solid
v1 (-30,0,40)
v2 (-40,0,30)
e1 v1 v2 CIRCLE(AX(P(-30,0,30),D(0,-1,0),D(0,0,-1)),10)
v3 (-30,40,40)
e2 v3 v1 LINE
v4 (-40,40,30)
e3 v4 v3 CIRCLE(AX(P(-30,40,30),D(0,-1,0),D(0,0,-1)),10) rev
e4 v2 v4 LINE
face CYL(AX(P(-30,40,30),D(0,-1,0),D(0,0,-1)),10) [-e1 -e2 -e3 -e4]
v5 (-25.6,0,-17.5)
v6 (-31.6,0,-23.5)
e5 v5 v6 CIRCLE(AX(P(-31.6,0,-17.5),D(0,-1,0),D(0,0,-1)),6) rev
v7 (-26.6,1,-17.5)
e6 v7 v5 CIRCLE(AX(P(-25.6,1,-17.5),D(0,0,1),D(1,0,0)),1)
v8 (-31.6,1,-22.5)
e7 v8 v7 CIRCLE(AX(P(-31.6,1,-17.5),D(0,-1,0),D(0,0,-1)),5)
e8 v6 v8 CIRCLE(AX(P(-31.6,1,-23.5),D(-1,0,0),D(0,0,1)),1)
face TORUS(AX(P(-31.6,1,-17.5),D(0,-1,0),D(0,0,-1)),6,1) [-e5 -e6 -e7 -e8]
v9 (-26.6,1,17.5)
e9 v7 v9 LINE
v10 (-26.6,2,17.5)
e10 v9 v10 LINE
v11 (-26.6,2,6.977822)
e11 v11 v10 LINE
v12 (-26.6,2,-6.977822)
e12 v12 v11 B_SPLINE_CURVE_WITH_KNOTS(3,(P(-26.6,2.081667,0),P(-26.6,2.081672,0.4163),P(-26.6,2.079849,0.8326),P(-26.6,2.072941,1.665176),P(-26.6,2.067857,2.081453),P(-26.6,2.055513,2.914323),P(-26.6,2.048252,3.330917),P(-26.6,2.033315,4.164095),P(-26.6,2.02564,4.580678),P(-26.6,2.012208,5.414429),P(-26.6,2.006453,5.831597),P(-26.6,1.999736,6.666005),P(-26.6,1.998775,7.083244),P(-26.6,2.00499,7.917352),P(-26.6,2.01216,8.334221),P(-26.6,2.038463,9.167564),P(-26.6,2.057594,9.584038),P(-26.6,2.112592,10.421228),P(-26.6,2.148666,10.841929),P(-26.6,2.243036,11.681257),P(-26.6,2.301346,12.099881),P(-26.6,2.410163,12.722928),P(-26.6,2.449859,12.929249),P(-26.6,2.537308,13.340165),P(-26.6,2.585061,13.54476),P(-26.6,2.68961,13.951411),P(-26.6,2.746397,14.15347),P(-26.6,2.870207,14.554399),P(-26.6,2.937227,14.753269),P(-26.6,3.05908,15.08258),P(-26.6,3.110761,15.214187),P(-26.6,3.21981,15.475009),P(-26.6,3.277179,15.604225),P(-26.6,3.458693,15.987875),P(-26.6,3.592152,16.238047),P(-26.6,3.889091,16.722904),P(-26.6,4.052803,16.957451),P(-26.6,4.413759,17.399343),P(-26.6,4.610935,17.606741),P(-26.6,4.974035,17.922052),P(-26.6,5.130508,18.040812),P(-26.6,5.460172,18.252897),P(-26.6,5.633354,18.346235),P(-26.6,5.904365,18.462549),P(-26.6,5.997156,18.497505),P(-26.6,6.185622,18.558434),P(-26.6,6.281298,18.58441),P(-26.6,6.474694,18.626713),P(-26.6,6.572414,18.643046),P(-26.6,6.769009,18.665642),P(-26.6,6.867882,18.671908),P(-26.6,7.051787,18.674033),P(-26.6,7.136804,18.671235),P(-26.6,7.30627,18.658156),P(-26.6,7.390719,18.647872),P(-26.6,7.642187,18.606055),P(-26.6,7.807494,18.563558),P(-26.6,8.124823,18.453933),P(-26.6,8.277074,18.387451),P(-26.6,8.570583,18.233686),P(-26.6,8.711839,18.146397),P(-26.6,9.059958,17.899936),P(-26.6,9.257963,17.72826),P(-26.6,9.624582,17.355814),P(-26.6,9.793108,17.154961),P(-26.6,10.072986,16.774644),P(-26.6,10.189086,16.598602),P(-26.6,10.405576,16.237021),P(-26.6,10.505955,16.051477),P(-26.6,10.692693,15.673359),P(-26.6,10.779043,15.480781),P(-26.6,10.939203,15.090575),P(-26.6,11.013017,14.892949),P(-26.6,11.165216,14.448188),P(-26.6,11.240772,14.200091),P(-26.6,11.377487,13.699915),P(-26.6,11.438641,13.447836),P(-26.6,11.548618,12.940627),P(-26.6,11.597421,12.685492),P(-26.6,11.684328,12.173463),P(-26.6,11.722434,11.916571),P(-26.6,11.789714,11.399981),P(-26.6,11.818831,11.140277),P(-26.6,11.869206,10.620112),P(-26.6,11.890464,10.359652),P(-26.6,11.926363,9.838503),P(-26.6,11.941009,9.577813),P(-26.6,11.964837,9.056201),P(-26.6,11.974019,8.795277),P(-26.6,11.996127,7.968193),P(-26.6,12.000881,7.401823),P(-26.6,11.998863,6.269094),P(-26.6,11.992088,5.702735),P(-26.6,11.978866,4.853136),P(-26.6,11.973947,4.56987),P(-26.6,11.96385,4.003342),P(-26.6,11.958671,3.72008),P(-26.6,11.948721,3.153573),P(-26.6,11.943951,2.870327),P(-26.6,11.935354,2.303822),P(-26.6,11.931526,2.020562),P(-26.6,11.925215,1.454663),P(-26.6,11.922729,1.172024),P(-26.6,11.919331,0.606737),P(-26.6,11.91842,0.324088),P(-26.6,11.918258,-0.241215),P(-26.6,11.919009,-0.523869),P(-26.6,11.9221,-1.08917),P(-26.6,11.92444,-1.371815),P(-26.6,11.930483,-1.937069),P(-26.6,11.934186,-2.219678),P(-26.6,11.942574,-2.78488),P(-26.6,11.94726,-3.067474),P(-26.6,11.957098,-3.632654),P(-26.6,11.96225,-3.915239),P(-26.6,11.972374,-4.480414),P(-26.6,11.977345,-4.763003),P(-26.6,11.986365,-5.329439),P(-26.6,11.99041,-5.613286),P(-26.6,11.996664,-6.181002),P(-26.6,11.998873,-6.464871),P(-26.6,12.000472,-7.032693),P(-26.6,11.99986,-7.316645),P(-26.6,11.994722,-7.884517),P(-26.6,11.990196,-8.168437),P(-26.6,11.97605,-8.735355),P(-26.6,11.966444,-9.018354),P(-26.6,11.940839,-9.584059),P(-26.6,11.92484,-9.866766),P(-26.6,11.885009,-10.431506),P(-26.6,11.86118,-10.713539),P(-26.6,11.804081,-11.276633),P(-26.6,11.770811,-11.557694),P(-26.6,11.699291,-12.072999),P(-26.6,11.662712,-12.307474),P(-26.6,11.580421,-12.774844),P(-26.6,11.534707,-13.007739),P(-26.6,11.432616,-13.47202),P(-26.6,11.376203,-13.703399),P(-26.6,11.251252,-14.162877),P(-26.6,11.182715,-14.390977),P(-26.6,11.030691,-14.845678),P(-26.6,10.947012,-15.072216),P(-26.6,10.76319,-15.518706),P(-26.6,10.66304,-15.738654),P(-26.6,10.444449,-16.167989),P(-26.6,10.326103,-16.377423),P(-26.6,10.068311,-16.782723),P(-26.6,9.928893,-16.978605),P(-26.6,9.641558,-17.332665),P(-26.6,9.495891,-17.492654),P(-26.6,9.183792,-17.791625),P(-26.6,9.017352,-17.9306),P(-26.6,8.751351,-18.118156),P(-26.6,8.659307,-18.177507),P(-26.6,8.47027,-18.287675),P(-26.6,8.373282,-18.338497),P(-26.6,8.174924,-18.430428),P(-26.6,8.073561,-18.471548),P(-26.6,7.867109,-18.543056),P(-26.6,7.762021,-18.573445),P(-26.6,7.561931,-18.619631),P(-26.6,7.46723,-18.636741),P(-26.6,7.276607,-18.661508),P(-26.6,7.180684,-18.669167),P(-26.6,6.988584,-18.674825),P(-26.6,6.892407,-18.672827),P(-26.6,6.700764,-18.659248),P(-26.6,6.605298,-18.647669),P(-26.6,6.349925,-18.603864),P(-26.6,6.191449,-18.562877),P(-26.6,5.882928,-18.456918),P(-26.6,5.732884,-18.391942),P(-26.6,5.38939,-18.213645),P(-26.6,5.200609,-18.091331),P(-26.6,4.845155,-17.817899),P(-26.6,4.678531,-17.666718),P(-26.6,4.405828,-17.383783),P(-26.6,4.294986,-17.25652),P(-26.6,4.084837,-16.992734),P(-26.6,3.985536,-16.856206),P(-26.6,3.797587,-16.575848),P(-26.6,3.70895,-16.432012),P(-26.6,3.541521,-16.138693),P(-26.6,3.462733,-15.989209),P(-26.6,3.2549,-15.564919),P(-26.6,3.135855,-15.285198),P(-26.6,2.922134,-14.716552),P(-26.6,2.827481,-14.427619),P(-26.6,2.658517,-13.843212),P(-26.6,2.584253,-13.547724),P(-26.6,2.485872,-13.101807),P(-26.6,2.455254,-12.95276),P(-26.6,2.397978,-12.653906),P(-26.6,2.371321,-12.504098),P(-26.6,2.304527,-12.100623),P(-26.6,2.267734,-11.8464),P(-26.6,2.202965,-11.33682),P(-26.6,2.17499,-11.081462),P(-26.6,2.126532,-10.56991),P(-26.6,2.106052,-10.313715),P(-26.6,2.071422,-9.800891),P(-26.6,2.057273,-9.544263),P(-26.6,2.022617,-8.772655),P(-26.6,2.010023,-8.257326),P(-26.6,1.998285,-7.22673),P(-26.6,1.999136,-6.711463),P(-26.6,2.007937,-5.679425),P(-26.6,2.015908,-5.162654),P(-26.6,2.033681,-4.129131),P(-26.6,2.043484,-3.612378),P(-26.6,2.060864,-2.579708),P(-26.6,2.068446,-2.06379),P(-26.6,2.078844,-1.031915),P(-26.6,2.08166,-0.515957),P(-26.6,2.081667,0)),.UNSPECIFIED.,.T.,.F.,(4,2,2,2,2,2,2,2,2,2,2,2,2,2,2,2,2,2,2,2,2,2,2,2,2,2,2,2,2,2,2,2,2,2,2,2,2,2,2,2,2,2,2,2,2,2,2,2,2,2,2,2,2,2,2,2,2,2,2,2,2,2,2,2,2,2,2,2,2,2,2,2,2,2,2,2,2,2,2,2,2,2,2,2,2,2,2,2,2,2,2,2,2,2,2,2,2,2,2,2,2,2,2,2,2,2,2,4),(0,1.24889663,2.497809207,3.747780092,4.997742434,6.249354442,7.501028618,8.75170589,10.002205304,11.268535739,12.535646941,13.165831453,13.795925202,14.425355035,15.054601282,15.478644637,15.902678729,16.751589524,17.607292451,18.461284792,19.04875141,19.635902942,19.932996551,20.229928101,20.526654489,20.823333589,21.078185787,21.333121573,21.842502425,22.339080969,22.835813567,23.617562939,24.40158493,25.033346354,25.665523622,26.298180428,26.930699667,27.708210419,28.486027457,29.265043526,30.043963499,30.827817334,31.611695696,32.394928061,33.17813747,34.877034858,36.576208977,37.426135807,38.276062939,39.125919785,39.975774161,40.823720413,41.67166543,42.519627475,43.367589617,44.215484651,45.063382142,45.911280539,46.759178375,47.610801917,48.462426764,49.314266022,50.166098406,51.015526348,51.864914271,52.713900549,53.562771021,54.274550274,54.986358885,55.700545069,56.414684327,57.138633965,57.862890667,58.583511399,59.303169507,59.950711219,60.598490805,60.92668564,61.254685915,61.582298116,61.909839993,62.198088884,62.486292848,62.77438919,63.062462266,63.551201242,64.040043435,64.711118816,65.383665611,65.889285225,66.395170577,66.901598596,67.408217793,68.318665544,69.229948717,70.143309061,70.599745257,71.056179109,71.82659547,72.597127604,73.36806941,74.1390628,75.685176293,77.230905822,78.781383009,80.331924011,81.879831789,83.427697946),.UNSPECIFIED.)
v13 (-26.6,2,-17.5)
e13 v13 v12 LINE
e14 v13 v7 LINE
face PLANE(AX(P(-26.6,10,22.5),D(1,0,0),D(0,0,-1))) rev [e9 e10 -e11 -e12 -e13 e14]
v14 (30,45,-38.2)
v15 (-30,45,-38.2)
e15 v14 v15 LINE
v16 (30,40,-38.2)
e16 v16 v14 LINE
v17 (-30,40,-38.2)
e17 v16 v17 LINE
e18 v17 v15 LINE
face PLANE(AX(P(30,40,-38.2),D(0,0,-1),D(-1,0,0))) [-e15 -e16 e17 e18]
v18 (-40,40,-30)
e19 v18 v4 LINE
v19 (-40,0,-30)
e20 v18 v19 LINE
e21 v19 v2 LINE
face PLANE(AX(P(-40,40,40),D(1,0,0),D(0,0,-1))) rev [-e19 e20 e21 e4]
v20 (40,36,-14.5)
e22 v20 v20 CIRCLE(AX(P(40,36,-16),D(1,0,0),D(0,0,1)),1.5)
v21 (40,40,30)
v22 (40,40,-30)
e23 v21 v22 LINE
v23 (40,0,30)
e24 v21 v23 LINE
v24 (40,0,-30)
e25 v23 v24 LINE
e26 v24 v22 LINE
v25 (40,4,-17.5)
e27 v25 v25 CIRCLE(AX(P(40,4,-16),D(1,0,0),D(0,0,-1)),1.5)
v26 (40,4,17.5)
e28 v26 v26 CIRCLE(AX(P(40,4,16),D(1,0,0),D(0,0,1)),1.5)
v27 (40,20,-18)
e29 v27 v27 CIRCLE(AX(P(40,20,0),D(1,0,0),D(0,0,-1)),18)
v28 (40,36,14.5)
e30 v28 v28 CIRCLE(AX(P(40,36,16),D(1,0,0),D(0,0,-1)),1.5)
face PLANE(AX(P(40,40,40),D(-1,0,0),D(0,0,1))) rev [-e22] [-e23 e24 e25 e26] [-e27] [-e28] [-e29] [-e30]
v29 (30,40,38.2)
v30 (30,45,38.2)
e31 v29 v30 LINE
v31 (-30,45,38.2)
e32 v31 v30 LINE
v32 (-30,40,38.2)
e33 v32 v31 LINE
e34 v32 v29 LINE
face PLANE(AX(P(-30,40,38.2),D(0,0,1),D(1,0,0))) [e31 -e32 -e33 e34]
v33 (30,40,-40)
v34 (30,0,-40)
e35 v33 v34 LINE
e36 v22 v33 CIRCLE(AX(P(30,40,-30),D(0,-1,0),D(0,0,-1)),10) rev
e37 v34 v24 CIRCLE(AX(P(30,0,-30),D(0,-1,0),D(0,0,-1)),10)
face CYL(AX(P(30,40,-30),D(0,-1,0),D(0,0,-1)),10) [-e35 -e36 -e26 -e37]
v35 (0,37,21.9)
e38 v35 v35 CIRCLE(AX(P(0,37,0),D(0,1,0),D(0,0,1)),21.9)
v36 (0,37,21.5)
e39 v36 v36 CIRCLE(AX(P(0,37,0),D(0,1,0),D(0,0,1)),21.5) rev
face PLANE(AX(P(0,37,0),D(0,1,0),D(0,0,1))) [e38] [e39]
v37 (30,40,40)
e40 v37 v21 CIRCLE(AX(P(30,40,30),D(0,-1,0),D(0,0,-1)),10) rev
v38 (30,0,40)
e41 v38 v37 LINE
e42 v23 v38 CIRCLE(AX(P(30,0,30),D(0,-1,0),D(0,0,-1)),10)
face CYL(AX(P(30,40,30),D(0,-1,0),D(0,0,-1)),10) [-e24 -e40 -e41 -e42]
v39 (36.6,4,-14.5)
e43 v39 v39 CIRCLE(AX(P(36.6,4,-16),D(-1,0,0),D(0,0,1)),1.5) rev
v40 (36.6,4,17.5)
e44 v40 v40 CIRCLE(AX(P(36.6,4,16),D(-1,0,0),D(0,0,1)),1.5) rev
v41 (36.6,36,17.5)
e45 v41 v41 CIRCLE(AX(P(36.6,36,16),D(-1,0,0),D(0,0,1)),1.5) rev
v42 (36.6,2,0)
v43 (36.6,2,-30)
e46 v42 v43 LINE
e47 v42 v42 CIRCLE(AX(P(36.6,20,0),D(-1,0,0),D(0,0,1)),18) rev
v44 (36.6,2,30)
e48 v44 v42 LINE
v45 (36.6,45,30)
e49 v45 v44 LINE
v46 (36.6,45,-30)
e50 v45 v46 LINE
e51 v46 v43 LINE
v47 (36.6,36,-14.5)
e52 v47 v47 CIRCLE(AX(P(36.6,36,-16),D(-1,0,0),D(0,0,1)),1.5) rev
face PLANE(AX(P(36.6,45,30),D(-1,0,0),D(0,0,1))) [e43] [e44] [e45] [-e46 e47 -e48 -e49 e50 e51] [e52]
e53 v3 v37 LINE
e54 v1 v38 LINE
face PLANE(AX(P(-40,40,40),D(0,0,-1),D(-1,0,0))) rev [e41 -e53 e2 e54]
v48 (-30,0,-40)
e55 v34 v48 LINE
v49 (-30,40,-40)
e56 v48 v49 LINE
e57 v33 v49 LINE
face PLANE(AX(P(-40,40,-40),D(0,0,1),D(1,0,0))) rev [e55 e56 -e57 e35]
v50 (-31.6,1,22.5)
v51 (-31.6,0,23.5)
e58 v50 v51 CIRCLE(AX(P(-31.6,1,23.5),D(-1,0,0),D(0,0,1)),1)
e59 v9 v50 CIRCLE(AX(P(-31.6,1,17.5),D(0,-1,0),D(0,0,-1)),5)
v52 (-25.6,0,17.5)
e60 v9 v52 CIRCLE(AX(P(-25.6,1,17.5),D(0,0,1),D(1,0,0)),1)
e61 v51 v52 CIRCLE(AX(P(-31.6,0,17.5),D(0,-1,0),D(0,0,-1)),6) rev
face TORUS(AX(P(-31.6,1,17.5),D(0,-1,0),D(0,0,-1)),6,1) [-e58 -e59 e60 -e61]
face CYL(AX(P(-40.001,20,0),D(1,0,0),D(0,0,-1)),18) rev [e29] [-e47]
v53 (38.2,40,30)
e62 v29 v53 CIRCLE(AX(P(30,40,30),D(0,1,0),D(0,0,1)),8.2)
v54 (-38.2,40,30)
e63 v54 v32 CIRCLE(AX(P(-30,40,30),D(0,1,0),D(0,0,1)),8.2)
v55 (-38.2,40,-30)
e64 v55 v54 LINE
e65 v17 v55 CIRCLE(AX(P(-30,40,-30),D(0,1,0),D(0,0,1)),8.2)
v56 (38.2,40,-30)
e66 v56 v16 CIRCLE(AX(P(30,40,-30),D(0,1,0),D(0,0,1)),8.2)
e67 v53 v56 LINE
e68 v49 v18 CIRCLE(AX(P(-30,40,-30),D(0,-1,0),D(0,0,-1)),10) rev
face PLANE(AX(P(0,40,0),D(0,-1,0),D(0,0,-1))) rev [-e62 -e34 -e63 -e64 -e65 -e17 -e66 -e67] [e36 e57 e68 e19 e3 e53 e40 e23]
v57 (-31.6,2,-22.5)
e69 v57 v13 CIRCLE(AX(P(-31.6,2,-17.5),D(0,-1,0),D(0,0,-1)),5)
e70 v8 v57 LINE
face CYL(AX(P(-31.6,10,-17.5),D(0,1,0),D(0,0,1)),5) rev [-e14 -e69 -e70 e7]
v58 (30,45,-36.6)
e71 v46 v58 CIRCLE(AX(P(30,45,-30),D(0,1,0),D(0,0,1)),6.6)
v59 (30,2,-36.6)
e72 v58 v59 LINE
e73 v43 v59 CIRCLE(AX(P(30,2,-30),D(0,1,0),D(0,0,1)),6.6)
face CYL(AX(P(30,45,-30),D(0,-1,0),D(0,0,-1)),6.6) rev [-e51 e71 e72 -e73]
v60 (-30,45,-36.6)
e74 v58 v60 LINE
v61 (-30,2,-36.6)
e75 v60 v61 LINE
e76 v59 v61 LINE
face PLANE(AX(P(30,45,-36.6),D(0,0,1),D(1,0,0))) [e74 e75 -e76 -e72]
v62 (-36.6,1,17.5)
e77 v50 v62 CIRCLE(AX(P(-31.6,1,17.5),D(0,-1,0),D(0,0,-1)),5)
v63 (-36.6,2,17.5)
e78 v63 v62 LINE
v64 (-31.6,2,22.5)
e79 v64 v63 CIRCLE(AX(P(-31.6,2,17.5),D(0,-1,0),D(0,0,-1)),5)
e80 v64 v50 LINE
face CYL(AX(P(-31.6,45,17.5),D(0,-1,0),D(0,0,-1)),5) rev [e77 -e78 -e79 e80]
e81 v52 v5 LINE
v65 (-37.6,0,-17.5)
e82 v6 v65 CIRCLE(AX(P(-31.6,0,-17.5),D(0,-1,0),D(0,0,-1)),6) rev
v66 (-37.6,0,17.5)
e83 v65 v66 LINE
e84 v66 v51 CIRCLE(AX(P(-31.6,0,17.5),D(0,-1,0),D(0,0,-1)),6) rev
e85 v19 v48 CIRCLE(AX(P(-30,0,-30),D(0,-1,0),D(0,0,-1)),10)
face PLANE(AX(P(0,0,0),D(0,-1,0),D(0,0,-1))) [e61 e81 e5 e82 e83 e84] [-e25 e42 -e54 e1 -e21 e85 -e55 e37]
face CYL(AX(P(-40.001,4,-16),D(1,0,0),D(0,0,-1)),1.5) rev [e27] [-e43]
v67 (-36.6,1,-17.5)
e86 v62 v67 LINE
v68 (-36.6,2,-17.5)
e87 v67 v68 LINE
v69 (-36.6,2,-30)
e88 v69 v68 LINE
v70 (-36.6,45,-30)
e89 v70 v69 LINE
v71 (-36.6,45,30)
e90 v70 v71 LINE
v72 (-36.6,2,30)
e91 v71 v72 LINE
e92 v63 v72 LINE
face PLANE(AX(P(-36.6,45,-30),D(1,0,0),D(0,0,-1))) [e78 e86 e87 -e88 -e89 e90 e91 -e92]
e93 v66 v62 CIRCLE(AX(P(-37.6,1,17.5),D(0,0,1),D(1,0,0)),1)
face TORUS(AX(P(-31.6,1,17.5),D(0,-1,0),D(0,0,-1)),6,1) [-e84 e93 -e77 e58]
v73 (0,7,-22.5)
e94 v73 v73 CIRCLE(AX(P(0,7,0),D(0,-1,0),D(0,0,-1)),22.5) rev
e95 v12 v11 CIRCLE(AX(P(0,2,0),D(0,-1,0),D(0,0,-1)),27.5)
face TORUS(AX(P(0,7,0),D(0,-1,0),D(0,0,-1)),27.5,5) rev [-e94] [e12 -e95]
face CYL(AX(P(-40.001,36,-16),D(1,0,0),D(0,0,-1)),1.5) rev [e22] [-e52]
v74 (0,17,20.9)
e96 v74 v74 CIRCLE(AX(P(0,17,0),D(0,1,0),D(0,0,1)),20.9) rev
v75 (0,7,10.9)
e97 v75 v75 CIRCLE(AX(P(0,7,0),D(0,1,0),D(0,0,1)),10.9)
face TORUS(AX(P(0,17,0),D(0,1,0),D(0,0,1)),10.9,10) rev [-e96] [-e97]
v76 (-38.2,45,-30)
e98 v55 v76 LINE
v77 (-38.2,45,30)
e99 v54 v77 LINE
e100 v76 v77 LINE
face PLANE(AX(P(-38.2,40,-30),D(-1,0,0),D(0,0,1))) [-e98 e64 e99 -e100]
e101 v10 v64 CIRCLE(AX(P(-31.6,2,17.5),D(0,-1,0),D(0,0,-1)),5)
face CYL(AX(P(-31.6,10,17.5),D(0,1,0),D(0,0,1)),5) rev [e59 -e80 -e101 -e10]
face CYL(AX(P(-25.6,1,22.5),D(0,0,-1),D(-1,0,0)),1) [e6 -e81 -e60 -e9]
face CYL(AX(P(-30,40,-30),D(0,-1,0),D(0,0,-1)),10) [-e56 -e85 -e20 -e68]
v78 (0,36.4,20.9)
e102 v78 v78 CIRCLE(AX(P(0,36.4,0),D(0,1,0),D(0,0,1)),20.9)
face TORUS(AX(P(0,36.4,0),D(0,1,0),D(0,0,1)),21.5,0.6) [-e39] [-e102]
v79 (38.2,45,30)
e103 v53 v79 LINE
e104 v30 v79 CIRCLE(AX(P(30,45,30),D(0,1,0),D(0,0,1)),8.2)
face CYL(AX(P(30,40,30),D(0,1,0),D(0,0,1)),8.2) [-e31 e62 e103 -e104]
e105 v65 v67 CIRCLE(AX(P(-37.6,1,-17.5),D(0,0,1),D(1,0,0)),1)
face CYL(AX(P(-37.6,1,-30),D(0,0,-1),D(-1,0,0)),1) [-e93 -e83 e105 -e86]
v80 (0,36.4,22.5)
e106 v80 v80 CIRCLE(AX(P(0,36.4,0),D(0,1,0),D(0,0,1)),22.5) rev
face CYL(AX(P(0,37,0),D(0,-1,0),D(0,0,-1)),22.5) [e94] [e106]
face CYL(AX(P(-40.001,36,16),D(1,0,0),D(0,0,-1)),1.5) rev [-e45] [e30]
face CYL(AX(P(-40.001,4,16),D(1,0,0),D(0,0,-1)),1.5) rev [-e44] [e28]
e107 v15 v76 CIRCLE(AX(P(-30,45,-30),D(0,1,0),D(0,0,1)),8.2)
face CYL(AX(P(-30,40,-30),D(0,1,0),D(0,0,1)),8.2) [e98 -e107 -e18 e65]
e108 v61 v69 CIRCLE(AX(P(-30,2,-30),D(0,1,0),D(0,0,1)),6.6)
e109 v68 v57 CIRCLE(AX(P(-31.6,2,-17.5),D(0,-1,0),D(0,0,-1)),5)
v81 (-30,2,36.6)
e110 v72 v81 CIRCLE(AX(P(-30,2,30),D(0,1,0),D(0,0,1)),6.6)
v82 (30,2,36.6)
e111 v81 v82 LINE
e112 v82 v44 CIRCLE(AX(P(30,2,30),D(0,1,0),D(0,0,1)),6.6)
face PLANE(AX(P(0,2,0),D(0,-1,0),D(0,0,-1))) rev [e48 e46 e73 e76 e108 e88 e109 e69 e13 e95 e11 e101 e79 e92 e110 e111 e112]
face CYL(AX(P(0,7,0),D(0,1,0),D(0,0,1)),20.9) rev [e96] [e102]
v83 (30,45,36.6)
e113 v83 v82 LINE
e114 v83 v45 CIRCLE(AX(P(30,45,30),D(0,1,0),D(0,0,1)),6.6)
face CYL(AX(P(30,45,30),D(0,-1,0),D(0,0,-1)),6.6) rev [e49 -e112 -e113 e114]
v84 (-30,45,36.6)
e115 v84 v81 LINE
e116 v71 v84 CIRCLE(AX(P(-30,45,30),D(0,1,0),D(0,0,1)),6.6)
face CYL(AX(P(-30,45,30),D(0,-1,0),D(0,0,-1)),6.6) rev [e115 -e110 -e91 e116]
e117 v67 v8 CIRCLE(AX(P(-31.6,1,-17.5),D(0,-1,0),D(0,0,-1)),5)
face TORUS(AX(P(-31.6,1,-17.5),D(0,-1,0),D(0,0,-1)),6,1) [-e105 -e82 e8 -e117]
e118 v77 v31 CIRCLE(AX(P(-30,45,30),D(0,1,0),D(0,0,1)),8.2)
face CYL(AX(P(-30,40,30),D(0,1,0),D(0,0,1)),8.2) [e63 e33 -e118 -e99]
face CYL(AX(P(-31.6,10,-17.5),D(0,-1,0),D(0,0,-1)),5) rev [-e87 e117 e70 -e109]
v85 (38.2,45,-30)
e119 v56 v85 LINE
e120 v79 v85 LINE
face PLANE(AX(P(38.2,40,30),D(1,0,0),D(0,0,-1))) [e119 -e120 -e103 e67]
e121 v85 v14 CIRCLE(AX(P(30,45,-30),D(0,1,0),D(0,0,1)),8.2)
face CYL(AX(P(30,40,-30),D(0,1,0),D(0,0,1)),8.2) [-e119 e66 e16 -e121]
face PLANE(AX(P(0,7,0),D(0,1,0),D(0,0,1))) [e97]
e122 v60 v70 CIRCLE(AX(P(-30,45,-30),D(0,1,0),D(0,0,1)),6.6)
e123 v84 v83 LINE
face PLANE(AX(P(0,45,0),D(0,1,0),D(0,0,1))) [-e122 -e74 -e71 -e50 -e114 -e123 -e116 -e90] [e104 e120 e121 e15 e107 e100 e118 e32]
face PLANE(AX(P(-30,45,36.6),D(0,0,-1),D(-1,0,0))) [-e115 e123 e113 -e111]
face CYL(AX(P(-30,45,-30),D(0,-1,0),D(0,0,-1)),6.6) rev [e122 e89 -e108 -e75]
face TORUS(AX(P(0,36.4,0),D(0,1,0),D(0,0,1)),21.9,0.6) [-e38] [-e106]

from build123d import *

# Parameters (mm, degrees)
SKETCH1_W                = 80
SKETCH1_H                = 80
BOSS_EXTRUDE1_DEPTH      = 40
FILLET1_R                = 10
BOSS_EXTRUDE5_DEPTH      = 5
CUT_EXTRUDE6_DEPTH       = 43
SKETCH8_R                = 22.5
BOSS_EXTRUDE4_DEPTH      = 35
SKETCH9_R                = 20.900000000000002
CUT_EXTRUDE5_DEPTH       = 30
FILLET2_R                = 10
CUT_FAN_REACH            = 102.125
SKETCH10_R               = 18
SKETCH10_R_2             = 1.5000000000000007
SKETCH10_R_3             = 1.5000000000000009
FILLET3_R                = 5
FILLET5_R                = 0.6
CUT_EXTRUDE10_DEPTH      = 8
CUT_EXTRUDE10_DEPTH_BACK = 8
FILLET10_R               = 5
FILLET9_R                = 1


with BuildPart() as part:
    # Sketch1 → Boss-Extrude1 (new body)
    with BuildSketch(Plane(origin=(0, 0, 0), x_dir=(1, 0, 0), z_dir=(0, 1, 0))):
        Rectangle(SKETCH1_W, SKETCH1_H)
    extrude(amount=BOSS_EXTRUDE1_DEPTH)

    # Fillet1
    fillet1_edges = [part.edges().sort_by_distance(p)[0] for p in [
        (40, 20, 40),
        (-40, 20, 40),
        (-40, 20, -40.00000000000001),
        (40, 20, -40.00000000000001),
    ]]
    fillet(fillet1_edges, radius=FILLET1_R)

    # 3DSketch4 → Boss-Extrude5 (add)
    with BuildSketch(Plane(origin=(-38.199999999999996, 40, -30.000000000000007), x_dir=(0.786461199740678, 0, 0.6176396856602184), z_dir=(0, 1, 0))):
        with BuildLine():
            Line((0, 0), (37.058381139613104, -47.187671984440684))
            ThreePointArc((37.058381139613104, -47.187671984440684), (42.52848931067159, -50.264390473830375), (48.57200839990046, -48.572008399900454))
            Line((48.57200839990046, -48.572008399900454), (95.75968038434114, -11.513627260287345))
            ThreePointArc((95.75968038434114, -11.513627260287345), (98.83639887373083, -6.043519089228864), (97.1440167998009, 0))
            Line((97.1440167998009, 0), (60.08563566018779, 47.187671984440684))
            ThreePointArc((60.08563566018779, 47.187671984440684), (54.61552748912932, 50.26439047383036), (48.572008399900454, 48.57200839990046))
            Line((48.572008399900454, 48.57200839990046), (1.3843364154597682, 11.513627260287349))
            ThreePointArc((1.3843364154597682, 11.513627260287349), (-1.6923820739299176, 6.0435190892288695), (0, 0))
        make_face()
    extrude(amount=BOSS_EXTRUDE5_DEPTH)

    # 3DSketch5 → Cut-Extrude6 (cut)
    with BuildSketch(Plane(origin=(-36.6, 45.00000000000001, -30.00000000000001), x_dir=(0.7733921049602126, 0, 0.6339279548854203), z_dir=(0, 1, 0))):
        with BuildLine():
            Line((0, 0), (38.03567729312523, -46.40352629761277))
            ThreePointArc((38.03567729312523, -46.40352629761277), (42.489199280610634, -48.78743047563925), (47.3239896881064, -47.32398968810639))
            Line((47.3239896881064, -47.32398968810639), (93.72751598571915, -9.288312394981173))
            ThreePointArc((93.72751598571915, -9.288312394981173), (96.11142016374562, -4.834790407495783), (94.64797937621279, 0))
            Line((94.64797937621279, 0), (56.612302083087584, 46.40352629761277))
            ThreePointArc((56.612302083087584, 46.40352629761277), (52.158780095602175, 48.78743047563926), (47.32398968810639, 47.323989688106394))
            Line((47.32398968810639, 47.323989688106394), (0.9204633904936338, 9.28831239498118))
            ThreePointArc((0.9204633904936338, 9.28831239498118), (-1.4634407875328472, 4.834790407495782), (0, 0))
        make_face()
    extrude(amount=-CUT_EXTRUDE6_DEPTH, mode=Mode.SUBTRACT)

    # Sketch8 → Boss-Extrude4 (add)
    with BuildSketch(Plane(origin=(0, 2.0000000000000018, 0), x_dir=(1, 0, 0), z_dir=(0, 1, 0))):
        with Locations(Location((0, 0, 0), (0, 0, 90))):
            Circle(SKETCH8_R)
    extrude(amount=BOSS_EXTRUDE4_DEPTH)

    # Sketch9 → Cut-Extrude5 (cut)
    with BuildSketch(Plane(origin=(0, 37.00000000000001, 0), x_dir=(1, 0, 0), z_dir=(0, 1, 0))):
        with Locations(Location((0, 0, 0), (0, 0, 270))):
            Circle(SKETCH9_R)
    extrude(amount=-CUT_EXTRUDE5_DEPTH, mode=Mode.SUBTRACT)

    # Fillet2
    fillet2_edges = [part.edges().sort_by_distance(p)[0] for p in [
        (1.568e-14, 7.000000000000007, -20.900000000000002),
    ]]
    fillet(fillet2_edges, radius=FILLET2_R)

    # Sketch10 → Cut-Fan (cut, up to next)
    with BuildSketch(Plane(origin=(40, 0, 0), x_dir=(0, 0, -1), z_dir=(1, 0, 0)), mode=Mode.PRIVATE) as cut_fan_sk1:
        with Locations((-1.3e-15, 20)):
            Circle(SKETCH10_R)
    cut_fan_tool1 = extrude(cut_fan_sk1.sketch, amount=-CUT_FAN_REACH, mode=Mode.PRIVATE) & part.part
    # Sketch10 → Cut-Fan (cut, up to next)
    with BuildSketch(Plane(origin=(40, 0, 0), x_dir=(0, 0, -1), z_dir=(1, 0, 0)), mode=Mode.PRIVATE) as cut_fan_sk2:
        with Locations((16, 4.0000000000000036)):
            Circle(SKETCH10_R_2)
    cut_fan_tool2 = extrude(cut_fan_sk2.sketch, amount=-CUT_FAN_REACH, mode=Mode.PRIVATE) & part.part
    # Sketch10 → Cut-Fan (cut, up to next)
    with BuildSketch(Plane(origin=(40, 0, 0), x_dir=(0, 0, -1), z_dir=(1, 0, 0)), mode=Mode.PRIVATE) as cut_fan_sk3:
        with Locations(Location((-16.000000000000007, 4.0000000000000036, 0), (0, 0, 180))):
            Circle(SKETCH10_R_2)
    cut_fan_tool3 = extrude(cut_fan_sk3.sketch, amount=-CUT_FAN_REACH, mode=Mode.PRIVATE) & part.part
    # Sketch10 → Cut-Fan (cut, up to next)
    with BuildSketch(Plane(origin=(40, 0, 0), x_dir=(0, 0, -1), z_dir=(1, 0, 0)), mode=Mode.PRIVATE) as cut_fan_sk4:
        with Locations((-15.999999999999979, 36)):
            Circle(SKETCH10_R_3)
    cut_fan_tool4 = extrude(cut_fan_sk4.sketch, amount=-CUT_FAN_REACH, mode=Mode.PRIVATE) & part.part
    # Sketch10 → Cut-Fan (cut, up to next)
    with BuildSketch(Plane(origin=(40, 0, 0), x_dir=(0, 0, -1), z_dir=(1, 0, 0)), mode=Mode.PRIVATE) as cut_fan_sk5:
        with Locations(Location((16.000000000000007, 36, 0), (0, 0, 180))):
            Circle(SKETCH10_R_3)
    cut_fan_tool5 = extrude(cut_fan_sk5.sketch, amount=-CUT_FAN_REACH, mode=Mode.PRIVATE) & part.part
    add(cut_fan_tool1.solids().sort_by_distance((40, 20, 0))[0], mode=Mode.SUBTRACT)
    add(cut_fan_tool2.solids().sort_by_distance((40, 4, -16))[0], mode=Mode.SUBTRACT)
    add(cut_fan_tool3.solids().sort_by_distance((40, 4, 16))[0], mode=Mode.SUBTRACT)
    add(cut_fan_tool4.solids().sort_by_distance((40, 36, 16))[0], mode=Mode.SUBTRACT)
    add(cut_fan_tool5.solids().sort_by_distance((40, 36, -16))[0], mode=Mode.SUBTRACT)

    # Fillet3
    fillet3_edges = [part.edges().sort_by_distance(p)[0] for p in [
        (-4.13e-15, 2.0000000000000018, 22.5),
    ]]
    fillet(fillet3_edges, radius=FILLET3_R)

    # Fillet5
    fillet5_edges = [part.edges().sort_by_distance(p)[0] for p in [
        (-4.13e-15, 37, 22.5),
        (1.568e-14, 37.00000000000001, -20.900000000000002),
    ]]
    fillet(fillet5_edges, radius=FILLET5_R)

    # Sketch12 → Cut-Extrude10 (cut, two sides: drawn at the far end of the back side and taken through both)
    with BuildSketch(Plane.XZ.offset(-2.0000000000000018).offset(-CUT_EXTRUDE10_DEPTH_BACK)):
        Polygon((-36.6, 22.500000000000007), (-26.6, 22.500000000000007), (-26.6, -22.499999999999993), (-36.6, -22.500000000000007), align=None)
    extrude(amount=CUT_EXTRUDE10_DEPTH + CUT_EXTRUDE10_DEPTH_BACK, mode=Mode.SUBTRACT)

    # Fillet10
    fillet10_edges = [part.edges().sort_by_distance(p)[0] for p in [
        (-36.6, 1.0000000000000036, 22.500000000000007),
        (-36.6, 1.0000000000000036, -22.500000000000007),
        (-26.6, 1.0000000000000036, 22.500000000000007),
        (-26.6, 1.0000000000000036, -22.499999999999993),
    ]]
    fillet(fillet10_edges, radius=FILLET10_R - 0.0001)  # a hair under: the kernel refuses the full size

    # Fillet9
    fillet9_edges = [part.edges().sort_by_distance(p)[0] for p in [
        (-36.6, 0, 1.78e-15),
        (-26.6, 0, 7.11e-15),
        (-35.13556319525462, 0, 21.035563195254625),
        (-35.13556319525462, 0, -21.03556319525462),
        (-28.06443680474538, 0, 21.035563195254625),
        (-28.06443680474538, 0, -21.035563195254614),
    ]]
    fillet(fillet9_edges, radius=FILLET9_R)


solid = part.part
